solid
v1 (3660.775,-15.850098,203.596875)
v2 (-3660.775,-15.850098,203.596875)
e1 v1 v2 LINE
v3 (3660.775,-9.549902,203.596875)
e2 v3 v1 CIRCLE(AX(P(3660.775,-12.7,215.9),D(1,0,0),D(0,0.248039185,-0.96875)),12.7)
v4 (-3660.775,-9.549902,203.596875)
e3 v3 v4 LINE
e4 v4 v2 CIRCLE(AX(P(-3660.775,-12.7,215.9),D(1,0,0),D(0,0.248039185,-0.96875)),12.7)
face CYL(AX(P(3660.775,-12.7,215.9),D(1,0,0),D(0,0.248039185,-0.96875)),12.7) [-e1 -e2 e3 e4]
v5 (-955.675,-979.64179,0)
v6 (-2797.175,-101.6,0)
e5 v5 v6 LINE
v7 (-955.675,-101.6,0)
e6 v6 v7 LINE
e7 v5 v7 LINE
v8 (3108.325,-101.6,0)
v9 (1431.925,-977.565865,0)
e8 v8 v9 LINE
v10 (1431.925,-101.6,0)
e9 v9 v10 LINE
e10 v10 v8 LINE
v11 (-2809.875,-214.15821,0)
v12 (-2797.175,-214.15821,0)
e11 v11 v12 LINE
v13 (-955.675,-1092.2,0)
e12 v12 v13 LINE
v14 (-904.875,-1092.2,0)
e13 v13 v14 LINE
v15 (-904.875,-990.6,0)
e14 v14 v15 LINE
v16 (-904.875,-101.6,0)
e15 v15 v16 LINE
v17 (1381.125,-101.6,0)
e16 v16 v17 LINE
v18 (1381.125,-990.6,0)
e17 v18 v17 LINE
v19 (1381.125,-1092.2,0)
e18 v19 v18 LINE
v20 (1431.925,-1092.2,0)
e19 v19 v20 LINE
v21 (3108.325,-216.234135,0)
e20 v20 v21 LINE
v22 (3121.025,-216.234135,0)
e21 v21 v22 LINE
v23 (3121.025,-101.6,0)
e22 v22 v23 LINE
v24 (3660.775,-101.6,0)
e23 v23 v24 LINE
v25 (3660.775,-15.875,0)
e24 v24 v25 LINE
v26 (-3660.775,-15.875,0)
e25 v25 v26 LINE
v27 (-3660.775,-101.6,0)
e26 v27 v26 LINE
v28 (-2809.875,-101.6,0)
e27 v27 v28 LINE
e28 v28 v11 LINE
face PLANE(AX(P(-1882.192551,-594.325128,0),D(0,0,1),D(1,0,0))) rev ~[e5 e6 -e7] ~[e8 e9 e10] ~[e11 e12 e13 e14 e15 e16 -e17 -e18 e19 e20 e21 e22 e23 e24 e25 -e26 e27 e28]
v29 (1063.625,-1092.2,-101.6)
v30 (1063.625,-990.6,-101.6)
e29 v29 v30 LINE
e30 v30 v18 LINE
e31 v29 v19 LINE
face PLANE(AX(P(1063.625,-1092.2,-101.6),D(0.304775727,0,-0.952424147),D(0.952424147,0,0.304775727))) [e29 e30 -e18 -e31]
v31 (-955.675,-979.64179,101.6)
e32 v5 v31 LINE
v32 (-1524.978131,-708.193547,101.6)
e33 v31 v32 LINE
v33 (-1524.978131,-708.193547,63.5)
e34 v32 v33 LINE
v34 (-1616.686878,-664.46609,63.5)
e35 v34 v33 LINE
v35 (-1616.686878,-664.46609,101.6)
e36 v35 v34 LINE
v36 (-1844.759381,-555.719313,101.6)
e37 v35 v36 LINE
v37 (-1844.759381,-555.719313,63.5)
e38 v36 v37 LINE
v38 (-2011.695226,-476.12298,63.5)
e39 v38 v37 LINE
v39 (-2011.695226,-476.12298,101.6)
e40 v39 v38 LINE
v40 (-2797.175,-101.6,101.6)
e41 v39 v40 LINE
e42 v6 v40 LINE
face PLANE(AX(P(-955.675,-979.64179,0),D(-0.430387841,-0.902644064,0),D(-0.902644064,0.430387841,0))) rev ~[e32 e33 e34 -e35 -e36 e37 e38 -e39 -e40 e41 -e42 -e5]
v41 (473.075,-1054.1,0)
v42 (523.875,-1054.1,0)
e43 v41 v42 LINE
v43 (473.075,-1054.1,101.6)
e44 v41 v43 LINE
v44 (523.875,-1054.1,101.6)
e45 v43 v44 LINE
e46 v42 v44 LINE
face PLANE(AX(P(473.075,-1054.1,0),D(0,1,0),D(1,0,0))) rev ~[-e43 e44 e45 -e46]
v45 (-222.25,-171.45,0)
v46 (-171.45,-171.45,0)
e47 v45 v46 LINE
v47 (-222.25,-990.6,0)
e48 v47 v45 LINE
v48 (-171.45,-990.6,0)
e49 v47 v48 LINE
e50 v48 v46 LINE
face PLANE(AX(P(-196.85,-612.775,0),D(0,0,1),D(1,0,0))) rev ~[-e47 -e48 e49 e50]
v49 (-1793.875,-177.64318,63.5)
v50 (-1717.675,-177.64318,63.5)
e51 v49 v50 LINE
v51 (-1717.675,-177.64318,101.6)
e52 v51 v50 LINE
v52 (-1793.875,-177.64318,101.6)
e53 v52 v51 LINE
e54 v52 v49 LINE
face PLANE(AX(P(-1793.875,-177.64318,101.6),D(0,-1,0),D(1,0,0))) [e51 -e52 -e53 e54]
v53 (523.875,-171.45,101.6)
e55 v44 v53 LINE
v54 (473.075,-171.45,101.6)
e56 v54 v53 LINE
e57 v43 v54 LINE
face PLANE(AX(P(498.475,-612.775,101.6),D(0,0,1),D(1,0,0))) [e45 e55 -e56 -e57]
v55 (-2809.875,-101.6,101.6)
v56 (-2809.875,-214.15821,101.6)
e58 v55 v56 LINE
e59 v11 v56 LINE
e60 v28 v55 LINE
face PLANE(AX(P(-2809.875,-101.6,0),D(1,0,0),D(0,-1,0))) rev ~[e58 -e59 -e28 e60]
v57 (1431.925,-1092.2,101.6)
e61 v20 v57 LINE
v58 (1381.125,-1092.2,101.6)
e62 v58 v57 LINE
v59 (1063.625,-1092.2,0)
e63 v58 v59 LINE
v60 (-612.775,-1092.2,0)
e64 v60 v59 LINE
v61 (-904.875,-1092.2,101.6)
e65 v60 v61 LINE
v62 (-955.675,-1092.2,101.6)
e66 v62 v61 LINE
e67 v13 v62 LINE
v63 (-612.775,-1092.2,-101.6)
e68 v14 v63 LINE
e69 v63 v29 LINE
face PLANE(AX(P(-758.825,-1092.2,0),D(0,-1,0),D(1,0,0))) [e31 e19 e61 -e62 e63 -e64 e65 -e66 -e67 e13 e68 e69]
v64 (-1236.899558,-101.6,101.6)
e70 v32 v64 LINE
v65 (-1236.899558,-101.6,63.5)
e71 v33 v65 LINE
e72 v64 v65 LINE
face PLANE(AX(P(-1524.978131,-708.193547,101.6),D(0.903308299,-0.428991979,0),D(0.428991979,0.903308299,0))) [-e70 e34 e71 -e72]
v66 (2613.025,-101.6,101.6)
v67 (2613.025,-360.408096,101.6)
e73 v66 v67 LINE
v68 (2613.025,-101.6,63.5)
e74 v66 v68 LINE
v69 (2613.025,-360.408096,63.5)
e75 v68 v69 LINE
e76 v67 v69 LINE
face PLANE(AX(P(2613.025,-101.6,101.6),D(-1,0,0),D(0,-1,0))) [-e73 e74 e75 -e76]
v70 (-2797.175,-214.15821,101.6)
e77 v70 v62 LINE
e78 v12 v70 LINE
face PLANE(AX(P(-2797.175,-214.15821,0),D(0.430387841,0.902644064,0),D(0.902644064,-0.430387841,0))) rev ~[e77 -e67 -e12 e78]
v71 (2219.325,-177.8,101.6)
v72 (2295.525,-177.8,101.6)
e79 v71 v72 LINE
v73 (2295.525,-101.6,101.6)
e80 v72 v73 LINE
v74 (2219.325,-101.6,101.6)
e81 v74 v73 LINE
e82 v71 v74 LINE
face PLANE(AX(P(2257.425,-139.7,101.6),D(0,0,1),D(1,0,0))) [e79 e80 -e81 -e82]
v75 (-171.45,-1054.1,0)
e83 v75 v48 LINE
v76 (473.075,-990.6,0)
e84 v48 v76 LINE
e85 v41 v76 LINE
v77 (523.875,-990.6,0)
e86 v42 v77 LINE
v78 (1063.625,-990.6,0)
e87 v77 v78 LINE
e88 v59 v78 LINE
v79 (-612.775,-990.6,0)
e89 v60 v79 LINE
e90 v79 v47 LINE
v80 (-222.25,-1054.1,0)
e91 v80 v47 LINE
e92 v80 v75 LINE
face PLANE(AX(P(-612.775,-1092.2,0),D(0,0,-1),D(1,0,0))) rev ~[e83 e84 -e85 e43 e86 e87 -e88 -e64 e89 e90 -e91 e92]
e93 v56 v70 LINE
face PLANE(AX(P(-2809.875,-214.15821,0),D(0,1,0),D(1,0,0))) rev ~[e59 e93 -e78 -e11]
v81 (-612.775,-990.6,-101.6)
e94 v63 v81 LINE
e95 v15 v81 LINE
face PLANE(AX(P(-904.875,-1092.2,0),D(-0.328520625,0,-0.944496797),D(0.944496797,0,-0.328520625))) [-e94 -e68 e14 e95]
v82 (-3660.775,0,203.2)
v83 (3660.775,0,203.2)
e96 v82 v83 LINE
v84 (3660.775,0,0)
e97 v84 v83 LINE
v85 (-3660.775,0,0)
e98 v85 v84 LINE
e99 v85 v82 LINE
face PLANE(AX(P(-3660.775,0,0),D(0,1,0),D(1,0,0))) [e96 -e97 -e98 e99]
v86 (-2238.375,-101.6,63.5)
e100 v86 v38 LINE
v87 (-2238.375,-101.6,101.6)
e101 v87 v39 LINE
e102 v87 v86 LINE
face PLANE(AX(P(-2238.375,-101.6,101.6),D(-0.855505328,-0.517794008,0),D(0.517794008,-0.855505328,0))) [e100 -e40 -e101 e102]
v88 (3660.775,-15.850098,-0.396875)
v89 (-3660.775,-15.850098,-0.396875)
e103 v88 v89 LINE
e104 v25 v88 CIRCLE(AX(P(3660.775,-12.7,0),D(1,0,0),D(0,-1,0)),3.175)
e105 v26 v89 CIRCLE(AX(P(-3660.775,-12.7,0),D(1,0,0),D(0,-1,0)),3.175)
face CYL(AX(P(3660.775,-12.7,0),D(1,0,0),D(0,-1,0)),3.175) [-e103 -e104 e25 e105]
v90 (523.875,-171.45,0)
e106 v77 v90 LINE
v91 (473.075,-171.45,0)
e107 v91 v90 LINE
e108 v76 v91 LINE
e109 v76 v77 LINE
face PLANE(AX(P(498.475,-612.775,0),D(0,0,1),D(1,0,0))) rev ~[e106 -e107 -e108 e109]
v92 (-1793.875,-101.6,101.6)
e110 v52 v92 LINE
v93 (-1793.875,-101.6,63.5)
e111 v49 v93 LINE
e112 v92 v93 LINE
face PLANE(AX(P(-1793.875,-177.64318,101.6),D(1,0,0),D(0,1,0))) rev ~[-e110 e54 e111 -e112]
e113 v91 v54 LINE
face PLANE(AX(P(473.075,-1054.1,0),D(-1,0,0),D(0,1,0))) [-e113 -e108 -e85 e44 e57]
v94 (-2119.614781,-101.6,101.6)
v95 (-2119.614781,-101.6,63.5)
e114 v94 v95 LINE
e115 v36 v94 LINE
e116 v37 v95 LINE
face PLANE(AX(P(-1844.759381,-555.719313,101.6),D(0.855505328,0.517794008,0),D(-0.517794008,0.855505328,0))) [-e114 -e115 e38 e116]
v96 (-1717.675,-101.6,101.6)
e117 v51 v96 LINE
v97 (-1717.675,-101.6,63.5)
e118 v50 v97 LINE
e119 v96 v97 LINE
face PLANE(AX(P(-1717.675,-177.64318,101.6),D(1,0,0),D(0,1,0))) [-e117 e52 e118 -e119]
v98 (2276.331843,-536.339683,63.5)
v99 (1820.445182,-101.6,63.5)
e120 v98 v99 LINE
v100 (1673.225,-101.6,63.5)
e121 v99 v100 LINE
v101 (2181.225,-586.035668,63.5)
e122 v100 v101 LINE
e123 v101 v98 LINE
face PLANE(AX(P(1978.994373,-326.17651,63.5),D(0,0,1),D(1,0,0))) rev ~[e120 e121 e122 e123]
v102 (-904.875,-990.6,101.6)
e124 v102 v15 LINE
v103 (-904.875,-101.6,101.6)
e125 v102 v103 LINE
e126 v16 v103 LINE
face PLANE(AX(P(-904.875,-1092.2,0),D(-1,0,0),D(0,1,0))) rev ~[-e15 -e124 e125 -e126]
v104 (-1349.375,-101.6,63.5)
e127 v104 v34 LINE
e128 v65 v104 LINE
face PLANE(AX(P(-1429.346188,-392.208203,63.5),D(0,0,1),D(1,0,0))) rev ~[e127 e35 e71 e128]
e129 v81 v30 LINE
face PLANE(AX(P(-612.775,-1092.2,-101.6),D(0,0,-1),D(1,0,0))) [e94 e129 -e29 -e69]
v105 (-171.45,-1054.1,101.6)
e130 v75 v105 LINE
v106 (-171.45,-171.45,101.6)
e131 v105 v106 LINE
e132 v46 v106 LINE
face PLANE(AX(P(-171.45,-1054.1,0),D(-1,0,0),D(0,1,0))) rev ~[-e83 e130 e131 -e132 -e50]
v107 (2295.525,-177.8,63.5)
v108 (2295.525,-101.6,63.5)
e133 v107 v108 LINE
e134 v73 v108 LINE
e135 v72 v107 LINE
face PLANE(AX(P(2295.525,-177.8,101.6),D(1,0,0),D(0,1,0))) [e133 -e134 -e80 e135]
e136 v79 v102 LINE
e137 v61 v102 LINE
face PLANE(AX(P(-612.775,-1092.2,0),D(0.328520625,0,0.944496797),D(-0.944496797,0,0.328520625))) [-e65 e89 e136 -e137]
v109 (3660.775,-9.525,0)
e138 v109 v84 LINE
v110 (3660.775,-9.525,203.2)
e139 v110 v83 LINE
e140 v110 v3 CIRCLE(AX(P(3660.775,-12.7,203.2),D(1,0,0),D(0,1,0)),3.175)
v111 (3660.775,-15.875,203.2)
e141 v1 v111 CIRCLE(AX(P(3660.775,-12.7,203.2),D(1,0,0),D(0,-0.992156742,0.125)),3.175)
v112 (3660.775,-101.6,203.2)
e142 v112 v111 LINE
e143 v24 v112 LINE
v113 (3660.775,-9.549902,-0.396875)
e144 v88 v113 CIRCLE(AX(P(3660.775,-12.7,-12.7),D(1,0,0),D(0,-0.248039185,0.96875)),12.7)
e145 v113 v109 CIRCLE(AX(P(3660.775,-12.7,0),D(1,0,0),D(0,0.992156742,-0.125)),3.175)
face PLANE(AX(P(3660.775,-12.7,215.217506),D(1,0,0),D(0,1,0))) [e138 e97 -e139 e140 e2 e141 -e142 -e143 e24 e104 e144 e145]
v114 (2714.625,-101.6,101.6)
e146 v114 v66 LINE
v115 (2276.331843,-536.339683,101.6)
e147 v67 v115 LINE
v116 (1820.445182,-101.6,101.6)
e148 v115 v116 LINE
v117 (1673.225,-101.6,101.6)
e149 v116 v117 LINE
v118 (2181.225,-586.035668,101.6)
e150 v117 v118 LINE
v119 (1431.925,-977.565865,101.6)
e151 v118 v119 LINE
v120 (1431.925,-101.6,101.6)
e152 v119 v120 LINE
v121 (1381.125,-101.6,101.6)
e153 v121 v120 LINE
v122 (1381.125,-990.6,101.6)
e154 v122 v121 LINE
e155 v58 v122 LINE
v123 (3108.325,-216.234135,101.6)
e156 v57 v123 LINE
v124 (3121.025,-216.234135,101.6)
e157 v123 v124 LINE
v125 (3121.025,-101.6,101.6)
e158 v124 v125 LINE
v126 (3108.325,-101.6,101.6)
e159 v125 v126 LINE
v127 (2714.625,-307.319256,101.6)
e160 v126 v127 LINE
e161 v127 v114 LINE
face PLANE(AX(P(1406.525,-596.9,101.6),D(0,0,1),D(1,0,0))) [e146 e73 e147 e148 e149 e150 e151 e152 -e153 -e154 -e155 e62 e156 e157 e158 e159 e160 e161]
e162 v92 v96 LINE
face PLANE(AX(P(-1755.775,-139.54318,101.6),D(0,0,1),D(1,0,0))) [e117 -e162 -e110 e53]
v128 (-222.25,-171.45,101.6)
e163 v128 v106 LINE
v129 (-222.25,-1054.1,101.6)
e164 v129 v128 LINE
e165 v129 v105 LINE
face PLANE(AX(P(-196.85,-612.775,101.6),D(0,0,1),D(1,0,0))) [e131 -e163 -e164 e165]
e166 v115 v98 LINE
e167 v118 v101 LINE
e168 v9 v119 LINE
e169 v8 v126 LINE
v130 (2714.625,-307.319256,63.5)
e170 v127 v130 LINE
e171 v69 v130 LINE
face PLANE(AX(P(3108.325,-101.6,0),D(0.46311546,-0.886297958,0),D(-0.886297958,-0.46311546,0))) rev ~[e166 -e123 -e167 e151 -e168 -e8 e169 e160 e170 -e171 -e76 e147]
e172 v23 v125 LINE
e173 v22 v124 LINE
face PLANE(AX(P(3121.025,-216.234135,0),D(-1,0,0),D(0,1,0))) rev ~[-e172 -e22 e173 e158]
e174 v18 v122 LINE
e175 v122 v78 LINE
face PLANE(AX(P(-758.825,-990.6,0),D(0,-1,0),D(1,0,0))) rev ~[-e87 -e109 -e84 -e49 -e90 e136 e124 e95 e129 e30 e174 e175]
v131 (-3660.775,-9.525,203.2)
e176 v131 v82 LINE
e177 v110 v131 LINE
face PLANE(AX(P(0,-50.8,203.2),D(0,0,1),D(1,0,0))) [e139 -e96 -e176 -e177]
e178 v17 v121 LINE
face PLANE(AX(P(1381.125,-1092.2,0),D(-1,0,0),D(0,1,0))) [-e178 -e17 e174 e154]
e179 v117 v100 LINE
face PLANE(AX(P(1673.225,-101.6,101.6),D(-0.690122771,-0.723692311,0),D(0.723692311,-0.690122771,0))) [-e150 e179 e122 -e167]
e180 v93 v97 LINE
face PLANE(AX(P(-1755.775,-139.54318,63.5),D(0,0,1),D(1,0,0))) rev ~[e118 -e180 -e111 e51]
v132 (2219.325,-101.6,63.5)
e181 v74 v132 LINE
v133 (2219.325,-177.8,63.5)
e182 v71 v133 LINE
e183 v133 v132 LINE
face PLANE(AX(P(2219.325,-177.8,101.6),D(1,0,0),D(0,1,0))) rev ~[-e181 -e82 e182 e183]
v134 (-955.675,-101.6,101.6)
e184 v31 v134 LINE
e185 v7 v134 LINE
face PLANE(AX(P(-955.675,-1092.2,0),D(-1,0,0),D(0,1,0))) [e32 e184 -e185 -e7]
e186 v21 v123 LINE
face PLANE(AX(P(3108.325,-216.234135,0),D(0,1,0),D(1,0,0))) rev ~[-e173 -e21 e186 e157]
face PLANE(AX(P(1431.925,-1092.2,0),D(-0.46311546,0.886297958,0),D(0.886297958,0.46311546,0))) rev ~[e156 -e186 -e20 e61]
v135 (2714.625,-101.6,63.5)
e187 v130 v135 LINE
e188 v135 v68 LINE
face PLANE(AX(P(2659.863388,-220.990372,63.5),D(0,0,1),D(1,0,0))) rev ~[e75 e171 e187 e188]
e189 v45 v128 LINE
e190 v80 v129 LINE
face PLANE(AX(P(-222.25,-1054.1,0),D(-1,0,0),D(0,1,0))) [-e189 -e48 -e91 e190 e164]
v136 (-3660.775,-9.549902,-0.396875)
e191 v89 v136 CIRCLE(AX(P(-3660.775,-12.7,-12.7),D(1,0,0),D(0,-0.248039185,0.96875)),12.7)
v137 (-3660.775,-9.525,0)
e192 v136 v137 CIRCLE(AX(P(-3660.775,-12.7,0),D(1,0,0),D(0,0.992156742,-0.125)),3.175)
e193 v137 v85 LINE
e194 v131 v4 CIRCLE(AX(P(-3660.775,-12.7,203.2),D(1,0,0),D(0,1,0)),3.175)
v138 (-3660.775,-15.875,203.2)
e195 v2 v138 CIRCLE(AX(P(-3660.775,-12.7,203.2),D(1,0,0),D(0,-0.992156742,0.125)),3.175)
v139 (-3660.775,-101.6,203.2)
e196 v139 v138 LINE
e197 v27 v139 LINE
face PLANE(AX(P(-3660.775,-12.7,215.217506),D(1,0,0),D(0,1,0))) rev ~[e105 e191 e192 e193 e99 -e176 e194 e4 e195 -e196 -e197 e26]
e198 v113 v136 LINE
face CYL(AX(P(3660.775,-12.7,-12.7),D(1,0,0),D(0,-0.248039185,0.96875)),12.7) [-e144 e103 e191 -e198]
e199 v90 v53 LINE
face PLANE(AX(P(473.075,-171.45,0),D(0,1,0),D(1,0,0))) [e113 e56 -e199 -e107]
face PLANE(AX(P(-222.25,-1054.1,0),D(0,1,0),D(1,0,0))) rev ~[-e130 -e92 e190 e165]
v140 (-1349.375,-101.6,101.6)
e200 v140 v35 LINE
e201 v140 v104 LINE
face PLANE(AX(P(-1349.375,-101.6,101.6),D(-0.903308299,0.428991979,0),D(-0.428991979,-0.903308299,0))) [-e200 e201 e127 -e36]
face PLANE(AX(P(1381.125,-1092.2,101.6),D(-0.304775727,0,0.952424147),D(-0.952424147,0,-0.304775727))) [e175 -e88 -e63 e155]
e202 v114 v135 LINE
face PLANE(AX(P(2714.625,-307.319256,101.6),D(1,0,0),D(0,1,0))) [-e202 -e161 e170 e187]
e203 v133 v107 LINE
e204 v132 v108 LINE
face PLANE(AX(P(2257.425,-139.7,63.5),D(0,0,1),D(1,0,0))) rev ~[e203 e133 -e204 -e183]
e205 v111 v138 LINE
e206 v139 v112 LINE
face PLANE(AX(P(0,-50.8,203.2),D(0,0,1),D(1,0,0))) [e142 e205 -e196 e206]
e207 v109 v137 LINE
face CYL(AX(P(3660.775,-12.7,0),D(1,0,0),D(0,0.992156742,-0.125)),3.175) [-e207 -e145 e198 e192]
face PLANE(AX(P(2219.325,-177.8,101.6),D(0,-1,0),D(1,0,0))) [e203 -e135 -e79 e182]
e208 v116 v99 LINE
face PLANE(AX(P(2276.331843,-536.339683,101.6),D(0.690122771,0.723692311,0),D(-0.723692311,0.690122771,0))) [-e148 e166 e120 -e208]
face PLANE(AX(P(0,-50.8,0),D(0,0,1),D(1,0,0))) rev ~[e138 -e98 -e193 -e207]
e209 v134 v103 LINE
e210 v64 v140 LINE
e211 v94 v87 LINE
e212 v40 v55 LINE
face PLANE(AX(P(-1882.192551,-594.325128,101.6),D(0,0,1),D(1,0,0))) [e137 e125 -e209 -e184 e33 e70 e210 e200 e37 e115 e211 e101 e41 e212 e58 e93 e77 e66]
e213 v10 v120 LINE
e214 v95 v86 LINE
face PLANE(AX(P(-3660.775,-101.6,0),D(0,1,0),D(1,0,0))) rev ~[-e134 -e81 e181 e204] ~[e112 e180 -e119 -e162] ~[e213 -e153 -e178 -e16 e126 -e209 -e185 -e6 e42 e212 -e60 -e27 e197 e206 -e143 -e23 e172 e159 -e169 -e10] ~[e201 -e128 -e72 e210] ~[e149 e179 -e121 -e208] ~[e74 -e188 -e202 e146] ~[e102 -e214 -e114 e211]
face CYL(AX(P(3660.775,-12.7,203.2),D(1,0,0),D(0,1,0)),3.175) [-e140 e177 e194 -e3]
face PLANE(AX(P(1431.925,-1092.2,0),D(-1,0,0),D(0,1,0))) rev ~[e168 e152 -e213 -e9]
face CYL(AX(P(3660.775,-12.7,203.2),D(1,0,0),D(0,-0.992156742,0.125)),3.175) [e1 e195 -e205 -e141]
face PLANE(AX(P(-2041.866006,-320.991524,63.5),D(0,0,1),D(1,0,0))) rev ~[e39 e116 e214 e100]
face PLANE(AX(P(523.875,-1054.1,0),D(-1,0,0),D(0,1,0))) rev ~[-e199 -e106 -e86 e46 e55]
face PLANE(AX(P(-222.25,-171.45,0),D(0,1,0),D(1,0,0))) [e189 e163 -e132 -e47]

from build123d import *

# Parameters (mm, degrees)
F5_W      = 7321.55
F5_H      = 101.6
F6_DEPTH  = 203.2
F8_DEPTH  = 7321.55
F9_W      = 50.8
F9_H      = 990.6
F10_DEPTH = 101.6
F11_W     = 50.8
F11_H     = 882.65
F12_DEPTH = 101.6
F14_DEPTH = 101.6
F15_W     = 1676.4
F15_H     = 101.6
F16_DEPTH = 101.6
F17_W     = 76.2
F17_H     = 76.2
F18_DEPTH = 38.1


# Not quite as in the source:
# - a variable given as a bare number and used for a length is read in inches; the dataset says mm whatever the document's units were


with BuildPart() as f6:
    # F5 (on Top) → F6 (new body)
    with BuildSketch(Plane.XY):
        with Locations((0, -50.8)):
            Rectangle(F5_W, F5_H)
    extrude(amount=F6_DEPTH)

    # F7 (on face) → F8 (join)
    with BuildSketch(Plane.YZ.offset(3660.775)):
        with BuildLine():
            ThreePointArc((-9.5499023453, 203.596875), (-2.6676463326, 208.1127103629), (0, 215.9))
            ThreePointArc((0, 215.9), (-20.4872896371, 225.9323536674), (-15.8500976547, 203.596875))
            ThreePointArc((-15.8500976547, 203.596875), (-12.7, 206.375), (-9.5499023453, 203.596875))
        make_face()
        with BuildLine():
            ThreePointArc((-12.7, 203.2), (-14.2875, 203.2996093811), (-15.8500976547, 203.596875))
            ThreePointArc((-15.8500976547, 203.596875), (-15.8687682981, 203.3988277473), (-15.875, 203.2))
            Line((-15.875, 203.2), (-12.7, 203.2))
        make_face()
        with BuildLine():
            ThreePointArc((-9.525, 203.2), (-9.5312317019, 203.3988277473), (-9.5499023453, 203.596875))
            ThreePointArc((-9.5499023453, 203.596875), (-11.1125, 203.2996093811), (-12.7, 203.2))
            Line((-12.7, 203.2), (-9.525, 203.2))
        make_face()
        with BuildLine():
            Line((-9.525, 203.2), (-12.7, 203.2))
            Line((-12.7, 203.2), (-15.875, 203.2))
            ThreePointArc((-15.875, 203.2), (-12.7, 200.025), (-9.525, 203.2))
        make_face()
        with BuildLine():
            ThreePointArc((-9.5499023453, 203.596875), (-12.7, 206.375), (-15.8500976547, 203.596875))
            ThreePointArc((-15.8500976547, 203.596875), (-14.2875, 203.2996093811), (-12.7, 203.2))
            ThreePointArc((-12.7, 203.2), (-11.1125, 203.2996093811), (-9.5499023453, 203.596875))
        make_face()
        with BuildLine():
            ThreePointArc((-9.5499023453, -0.396875), (-12.7, -3.175), (-15.8500976547, -0.396875))
            ThreePointArc((-15.8500976547, -0.396875), (-20.4872896371, -22.7323536674), (0, -12.7))
            ThreePointArc((0, -12.7), (-2.6676463326, -4.9127103629), (-9.5499023453, -0.396875))
        make_face()
        with BuildLine():
            ThreePointArc((-12.7, 0), (-14.2875, -0.0996093811), (-15.8500976547, -0.396875))
            ThreePointArc((-15.8500976547, -0.396875), (-12.7, -3.175), (-9.5499023453, -0.396875))
            ThreePointArc((-9.5499023453, -0.396875), (-11.1125, -0.0996093811), (-12.7, 0))
        make_face()
        with BuildLine():
            Line((-12.7, 0), (-15.875, 0))
            ThreePointArc((-15.875, 0), (-15.8687682981, -0.1988277473), (-15.8500976547, -0.396875))
            ThreePointArc((-15.8500976547, -0.396875), (-14.2875, -0.0996093811), (-12.7, 0))
        make_face()
        with BuildLine():
            ThreePointArc((-9.5499023453, -0.396875), (-9.5312317019, -0.1988277473), (-9.525, 0))
            Line((-9.525, 0), (-12.7, 0))
            ThreePointArc((-12.7, 0), (-11.1125, -0.0996093811), (-9.5499023453, -0.396875))
        make_face()
    extrude(amount=-F8_DEPTH)

    # F9 (on Top) → F10 (join)
    with BuildSketch(Plane.XY):
        with Locations((-930.275, -596.9)):
            Rectangle(F9_W, F9_H)
        with Locations((1406.525, -596.9)):
            Rectangle(F9_W, F9_H)
    extrude(amount=F10_DEPTH)

    # F13 (on Top) → F14 (join)
    with BuildSketch(Plane.XY):
        Polygon((-955.675, -979.6417901101), (-2797.175, -101.6), (-2809.875, -101.6), (-2809.875, -214.1582098899), (-2797.175, -214.1582098899), (-955.675, -1092.2), align=None)
        Polygon((3108.325, -101.6), (1431.925, -977.565864756), (1431.925, -1092.2), (3108.325, -216.234135244), (3121.025, -216.234135244), (3121.025, -101.6), align=None)
    extrude(amount=F14_DEPTH)



with BuildPart() as f12:
    # F11 (on Top) → F12 (new body)
    with BuildSketch(Plane.XY):
        with Locations((-196.85, -612.775)):
            Rectangle(F11_W, F11_H)
    extrude(amount=F12_DEPTH)


with BuildPart() as f12b:
    # F11 (on Top) → F12, piece 2 (new body)
    with BuildSketch(Plane.XY):
        with Locations((498.475, -612.775)):
            Rectangle(F11_W, F11_H)
    extrude(amount=F12_DEPTH)


with BuildPart() as f6_1:
    add(f6.part)

    add(f12.part)  # F16 merges F12

    add(f12b.part)  # F16 merges F12b
    # F15 (on face) → F16 (join)
    with BuildSketch(Plane.XZ.offset(1092.2)):
        Polygon((-612.775, -101.6), (-612.775, 0), (-904.875, 101.6), (-904.875, 0), align=None)
        with Locations((225.425, -50.8)):
            Rectangle(F15_W, F15_H)
        Polygon((1381.125, 101.6), (1063.625, 0), (1063.625, -101.6), (1381.125, 0), align=None)
    extrude(amount=-F16_DEPTH)

    # F17 (on face) → F18 (join)
    with BuildSketch(Plane.XY.offset(101.6)):
        Polygon((-2119.6147810739, -101.6), (-2238.375, -101.6), (-2011.695225595, -476.1229797523), (-1844.759380981, -555.7193130884), align=None)
        with Locations((-1755.775, -139.5431798935)):
            Rectangle(F17_W, F17_H)
        Polygon((-1349.375, -101.6), (-1616.686877804, -664.4660896099), (-1524.9781313366, -708.1935465292), (-1236.8995581561, -101.6), align=None)
        Polygon((2276.3318432651, -536.339683256), (1820.4451820405, -101.6), (1673.225, -101.6), (2181.225, -586.0356676302), align=None)
        with Locations((2257.425, -139.7)):
            Rectangle(F17_W, F17_H)
        Polygon((2714.625, -101.6), (2613.025, -101.6), (2613.025, -360.4080964052), (2714.625, -307.3192561169), align=None)
    extrude(amount=-F18_DEPTH)


solid = f6_1.part
